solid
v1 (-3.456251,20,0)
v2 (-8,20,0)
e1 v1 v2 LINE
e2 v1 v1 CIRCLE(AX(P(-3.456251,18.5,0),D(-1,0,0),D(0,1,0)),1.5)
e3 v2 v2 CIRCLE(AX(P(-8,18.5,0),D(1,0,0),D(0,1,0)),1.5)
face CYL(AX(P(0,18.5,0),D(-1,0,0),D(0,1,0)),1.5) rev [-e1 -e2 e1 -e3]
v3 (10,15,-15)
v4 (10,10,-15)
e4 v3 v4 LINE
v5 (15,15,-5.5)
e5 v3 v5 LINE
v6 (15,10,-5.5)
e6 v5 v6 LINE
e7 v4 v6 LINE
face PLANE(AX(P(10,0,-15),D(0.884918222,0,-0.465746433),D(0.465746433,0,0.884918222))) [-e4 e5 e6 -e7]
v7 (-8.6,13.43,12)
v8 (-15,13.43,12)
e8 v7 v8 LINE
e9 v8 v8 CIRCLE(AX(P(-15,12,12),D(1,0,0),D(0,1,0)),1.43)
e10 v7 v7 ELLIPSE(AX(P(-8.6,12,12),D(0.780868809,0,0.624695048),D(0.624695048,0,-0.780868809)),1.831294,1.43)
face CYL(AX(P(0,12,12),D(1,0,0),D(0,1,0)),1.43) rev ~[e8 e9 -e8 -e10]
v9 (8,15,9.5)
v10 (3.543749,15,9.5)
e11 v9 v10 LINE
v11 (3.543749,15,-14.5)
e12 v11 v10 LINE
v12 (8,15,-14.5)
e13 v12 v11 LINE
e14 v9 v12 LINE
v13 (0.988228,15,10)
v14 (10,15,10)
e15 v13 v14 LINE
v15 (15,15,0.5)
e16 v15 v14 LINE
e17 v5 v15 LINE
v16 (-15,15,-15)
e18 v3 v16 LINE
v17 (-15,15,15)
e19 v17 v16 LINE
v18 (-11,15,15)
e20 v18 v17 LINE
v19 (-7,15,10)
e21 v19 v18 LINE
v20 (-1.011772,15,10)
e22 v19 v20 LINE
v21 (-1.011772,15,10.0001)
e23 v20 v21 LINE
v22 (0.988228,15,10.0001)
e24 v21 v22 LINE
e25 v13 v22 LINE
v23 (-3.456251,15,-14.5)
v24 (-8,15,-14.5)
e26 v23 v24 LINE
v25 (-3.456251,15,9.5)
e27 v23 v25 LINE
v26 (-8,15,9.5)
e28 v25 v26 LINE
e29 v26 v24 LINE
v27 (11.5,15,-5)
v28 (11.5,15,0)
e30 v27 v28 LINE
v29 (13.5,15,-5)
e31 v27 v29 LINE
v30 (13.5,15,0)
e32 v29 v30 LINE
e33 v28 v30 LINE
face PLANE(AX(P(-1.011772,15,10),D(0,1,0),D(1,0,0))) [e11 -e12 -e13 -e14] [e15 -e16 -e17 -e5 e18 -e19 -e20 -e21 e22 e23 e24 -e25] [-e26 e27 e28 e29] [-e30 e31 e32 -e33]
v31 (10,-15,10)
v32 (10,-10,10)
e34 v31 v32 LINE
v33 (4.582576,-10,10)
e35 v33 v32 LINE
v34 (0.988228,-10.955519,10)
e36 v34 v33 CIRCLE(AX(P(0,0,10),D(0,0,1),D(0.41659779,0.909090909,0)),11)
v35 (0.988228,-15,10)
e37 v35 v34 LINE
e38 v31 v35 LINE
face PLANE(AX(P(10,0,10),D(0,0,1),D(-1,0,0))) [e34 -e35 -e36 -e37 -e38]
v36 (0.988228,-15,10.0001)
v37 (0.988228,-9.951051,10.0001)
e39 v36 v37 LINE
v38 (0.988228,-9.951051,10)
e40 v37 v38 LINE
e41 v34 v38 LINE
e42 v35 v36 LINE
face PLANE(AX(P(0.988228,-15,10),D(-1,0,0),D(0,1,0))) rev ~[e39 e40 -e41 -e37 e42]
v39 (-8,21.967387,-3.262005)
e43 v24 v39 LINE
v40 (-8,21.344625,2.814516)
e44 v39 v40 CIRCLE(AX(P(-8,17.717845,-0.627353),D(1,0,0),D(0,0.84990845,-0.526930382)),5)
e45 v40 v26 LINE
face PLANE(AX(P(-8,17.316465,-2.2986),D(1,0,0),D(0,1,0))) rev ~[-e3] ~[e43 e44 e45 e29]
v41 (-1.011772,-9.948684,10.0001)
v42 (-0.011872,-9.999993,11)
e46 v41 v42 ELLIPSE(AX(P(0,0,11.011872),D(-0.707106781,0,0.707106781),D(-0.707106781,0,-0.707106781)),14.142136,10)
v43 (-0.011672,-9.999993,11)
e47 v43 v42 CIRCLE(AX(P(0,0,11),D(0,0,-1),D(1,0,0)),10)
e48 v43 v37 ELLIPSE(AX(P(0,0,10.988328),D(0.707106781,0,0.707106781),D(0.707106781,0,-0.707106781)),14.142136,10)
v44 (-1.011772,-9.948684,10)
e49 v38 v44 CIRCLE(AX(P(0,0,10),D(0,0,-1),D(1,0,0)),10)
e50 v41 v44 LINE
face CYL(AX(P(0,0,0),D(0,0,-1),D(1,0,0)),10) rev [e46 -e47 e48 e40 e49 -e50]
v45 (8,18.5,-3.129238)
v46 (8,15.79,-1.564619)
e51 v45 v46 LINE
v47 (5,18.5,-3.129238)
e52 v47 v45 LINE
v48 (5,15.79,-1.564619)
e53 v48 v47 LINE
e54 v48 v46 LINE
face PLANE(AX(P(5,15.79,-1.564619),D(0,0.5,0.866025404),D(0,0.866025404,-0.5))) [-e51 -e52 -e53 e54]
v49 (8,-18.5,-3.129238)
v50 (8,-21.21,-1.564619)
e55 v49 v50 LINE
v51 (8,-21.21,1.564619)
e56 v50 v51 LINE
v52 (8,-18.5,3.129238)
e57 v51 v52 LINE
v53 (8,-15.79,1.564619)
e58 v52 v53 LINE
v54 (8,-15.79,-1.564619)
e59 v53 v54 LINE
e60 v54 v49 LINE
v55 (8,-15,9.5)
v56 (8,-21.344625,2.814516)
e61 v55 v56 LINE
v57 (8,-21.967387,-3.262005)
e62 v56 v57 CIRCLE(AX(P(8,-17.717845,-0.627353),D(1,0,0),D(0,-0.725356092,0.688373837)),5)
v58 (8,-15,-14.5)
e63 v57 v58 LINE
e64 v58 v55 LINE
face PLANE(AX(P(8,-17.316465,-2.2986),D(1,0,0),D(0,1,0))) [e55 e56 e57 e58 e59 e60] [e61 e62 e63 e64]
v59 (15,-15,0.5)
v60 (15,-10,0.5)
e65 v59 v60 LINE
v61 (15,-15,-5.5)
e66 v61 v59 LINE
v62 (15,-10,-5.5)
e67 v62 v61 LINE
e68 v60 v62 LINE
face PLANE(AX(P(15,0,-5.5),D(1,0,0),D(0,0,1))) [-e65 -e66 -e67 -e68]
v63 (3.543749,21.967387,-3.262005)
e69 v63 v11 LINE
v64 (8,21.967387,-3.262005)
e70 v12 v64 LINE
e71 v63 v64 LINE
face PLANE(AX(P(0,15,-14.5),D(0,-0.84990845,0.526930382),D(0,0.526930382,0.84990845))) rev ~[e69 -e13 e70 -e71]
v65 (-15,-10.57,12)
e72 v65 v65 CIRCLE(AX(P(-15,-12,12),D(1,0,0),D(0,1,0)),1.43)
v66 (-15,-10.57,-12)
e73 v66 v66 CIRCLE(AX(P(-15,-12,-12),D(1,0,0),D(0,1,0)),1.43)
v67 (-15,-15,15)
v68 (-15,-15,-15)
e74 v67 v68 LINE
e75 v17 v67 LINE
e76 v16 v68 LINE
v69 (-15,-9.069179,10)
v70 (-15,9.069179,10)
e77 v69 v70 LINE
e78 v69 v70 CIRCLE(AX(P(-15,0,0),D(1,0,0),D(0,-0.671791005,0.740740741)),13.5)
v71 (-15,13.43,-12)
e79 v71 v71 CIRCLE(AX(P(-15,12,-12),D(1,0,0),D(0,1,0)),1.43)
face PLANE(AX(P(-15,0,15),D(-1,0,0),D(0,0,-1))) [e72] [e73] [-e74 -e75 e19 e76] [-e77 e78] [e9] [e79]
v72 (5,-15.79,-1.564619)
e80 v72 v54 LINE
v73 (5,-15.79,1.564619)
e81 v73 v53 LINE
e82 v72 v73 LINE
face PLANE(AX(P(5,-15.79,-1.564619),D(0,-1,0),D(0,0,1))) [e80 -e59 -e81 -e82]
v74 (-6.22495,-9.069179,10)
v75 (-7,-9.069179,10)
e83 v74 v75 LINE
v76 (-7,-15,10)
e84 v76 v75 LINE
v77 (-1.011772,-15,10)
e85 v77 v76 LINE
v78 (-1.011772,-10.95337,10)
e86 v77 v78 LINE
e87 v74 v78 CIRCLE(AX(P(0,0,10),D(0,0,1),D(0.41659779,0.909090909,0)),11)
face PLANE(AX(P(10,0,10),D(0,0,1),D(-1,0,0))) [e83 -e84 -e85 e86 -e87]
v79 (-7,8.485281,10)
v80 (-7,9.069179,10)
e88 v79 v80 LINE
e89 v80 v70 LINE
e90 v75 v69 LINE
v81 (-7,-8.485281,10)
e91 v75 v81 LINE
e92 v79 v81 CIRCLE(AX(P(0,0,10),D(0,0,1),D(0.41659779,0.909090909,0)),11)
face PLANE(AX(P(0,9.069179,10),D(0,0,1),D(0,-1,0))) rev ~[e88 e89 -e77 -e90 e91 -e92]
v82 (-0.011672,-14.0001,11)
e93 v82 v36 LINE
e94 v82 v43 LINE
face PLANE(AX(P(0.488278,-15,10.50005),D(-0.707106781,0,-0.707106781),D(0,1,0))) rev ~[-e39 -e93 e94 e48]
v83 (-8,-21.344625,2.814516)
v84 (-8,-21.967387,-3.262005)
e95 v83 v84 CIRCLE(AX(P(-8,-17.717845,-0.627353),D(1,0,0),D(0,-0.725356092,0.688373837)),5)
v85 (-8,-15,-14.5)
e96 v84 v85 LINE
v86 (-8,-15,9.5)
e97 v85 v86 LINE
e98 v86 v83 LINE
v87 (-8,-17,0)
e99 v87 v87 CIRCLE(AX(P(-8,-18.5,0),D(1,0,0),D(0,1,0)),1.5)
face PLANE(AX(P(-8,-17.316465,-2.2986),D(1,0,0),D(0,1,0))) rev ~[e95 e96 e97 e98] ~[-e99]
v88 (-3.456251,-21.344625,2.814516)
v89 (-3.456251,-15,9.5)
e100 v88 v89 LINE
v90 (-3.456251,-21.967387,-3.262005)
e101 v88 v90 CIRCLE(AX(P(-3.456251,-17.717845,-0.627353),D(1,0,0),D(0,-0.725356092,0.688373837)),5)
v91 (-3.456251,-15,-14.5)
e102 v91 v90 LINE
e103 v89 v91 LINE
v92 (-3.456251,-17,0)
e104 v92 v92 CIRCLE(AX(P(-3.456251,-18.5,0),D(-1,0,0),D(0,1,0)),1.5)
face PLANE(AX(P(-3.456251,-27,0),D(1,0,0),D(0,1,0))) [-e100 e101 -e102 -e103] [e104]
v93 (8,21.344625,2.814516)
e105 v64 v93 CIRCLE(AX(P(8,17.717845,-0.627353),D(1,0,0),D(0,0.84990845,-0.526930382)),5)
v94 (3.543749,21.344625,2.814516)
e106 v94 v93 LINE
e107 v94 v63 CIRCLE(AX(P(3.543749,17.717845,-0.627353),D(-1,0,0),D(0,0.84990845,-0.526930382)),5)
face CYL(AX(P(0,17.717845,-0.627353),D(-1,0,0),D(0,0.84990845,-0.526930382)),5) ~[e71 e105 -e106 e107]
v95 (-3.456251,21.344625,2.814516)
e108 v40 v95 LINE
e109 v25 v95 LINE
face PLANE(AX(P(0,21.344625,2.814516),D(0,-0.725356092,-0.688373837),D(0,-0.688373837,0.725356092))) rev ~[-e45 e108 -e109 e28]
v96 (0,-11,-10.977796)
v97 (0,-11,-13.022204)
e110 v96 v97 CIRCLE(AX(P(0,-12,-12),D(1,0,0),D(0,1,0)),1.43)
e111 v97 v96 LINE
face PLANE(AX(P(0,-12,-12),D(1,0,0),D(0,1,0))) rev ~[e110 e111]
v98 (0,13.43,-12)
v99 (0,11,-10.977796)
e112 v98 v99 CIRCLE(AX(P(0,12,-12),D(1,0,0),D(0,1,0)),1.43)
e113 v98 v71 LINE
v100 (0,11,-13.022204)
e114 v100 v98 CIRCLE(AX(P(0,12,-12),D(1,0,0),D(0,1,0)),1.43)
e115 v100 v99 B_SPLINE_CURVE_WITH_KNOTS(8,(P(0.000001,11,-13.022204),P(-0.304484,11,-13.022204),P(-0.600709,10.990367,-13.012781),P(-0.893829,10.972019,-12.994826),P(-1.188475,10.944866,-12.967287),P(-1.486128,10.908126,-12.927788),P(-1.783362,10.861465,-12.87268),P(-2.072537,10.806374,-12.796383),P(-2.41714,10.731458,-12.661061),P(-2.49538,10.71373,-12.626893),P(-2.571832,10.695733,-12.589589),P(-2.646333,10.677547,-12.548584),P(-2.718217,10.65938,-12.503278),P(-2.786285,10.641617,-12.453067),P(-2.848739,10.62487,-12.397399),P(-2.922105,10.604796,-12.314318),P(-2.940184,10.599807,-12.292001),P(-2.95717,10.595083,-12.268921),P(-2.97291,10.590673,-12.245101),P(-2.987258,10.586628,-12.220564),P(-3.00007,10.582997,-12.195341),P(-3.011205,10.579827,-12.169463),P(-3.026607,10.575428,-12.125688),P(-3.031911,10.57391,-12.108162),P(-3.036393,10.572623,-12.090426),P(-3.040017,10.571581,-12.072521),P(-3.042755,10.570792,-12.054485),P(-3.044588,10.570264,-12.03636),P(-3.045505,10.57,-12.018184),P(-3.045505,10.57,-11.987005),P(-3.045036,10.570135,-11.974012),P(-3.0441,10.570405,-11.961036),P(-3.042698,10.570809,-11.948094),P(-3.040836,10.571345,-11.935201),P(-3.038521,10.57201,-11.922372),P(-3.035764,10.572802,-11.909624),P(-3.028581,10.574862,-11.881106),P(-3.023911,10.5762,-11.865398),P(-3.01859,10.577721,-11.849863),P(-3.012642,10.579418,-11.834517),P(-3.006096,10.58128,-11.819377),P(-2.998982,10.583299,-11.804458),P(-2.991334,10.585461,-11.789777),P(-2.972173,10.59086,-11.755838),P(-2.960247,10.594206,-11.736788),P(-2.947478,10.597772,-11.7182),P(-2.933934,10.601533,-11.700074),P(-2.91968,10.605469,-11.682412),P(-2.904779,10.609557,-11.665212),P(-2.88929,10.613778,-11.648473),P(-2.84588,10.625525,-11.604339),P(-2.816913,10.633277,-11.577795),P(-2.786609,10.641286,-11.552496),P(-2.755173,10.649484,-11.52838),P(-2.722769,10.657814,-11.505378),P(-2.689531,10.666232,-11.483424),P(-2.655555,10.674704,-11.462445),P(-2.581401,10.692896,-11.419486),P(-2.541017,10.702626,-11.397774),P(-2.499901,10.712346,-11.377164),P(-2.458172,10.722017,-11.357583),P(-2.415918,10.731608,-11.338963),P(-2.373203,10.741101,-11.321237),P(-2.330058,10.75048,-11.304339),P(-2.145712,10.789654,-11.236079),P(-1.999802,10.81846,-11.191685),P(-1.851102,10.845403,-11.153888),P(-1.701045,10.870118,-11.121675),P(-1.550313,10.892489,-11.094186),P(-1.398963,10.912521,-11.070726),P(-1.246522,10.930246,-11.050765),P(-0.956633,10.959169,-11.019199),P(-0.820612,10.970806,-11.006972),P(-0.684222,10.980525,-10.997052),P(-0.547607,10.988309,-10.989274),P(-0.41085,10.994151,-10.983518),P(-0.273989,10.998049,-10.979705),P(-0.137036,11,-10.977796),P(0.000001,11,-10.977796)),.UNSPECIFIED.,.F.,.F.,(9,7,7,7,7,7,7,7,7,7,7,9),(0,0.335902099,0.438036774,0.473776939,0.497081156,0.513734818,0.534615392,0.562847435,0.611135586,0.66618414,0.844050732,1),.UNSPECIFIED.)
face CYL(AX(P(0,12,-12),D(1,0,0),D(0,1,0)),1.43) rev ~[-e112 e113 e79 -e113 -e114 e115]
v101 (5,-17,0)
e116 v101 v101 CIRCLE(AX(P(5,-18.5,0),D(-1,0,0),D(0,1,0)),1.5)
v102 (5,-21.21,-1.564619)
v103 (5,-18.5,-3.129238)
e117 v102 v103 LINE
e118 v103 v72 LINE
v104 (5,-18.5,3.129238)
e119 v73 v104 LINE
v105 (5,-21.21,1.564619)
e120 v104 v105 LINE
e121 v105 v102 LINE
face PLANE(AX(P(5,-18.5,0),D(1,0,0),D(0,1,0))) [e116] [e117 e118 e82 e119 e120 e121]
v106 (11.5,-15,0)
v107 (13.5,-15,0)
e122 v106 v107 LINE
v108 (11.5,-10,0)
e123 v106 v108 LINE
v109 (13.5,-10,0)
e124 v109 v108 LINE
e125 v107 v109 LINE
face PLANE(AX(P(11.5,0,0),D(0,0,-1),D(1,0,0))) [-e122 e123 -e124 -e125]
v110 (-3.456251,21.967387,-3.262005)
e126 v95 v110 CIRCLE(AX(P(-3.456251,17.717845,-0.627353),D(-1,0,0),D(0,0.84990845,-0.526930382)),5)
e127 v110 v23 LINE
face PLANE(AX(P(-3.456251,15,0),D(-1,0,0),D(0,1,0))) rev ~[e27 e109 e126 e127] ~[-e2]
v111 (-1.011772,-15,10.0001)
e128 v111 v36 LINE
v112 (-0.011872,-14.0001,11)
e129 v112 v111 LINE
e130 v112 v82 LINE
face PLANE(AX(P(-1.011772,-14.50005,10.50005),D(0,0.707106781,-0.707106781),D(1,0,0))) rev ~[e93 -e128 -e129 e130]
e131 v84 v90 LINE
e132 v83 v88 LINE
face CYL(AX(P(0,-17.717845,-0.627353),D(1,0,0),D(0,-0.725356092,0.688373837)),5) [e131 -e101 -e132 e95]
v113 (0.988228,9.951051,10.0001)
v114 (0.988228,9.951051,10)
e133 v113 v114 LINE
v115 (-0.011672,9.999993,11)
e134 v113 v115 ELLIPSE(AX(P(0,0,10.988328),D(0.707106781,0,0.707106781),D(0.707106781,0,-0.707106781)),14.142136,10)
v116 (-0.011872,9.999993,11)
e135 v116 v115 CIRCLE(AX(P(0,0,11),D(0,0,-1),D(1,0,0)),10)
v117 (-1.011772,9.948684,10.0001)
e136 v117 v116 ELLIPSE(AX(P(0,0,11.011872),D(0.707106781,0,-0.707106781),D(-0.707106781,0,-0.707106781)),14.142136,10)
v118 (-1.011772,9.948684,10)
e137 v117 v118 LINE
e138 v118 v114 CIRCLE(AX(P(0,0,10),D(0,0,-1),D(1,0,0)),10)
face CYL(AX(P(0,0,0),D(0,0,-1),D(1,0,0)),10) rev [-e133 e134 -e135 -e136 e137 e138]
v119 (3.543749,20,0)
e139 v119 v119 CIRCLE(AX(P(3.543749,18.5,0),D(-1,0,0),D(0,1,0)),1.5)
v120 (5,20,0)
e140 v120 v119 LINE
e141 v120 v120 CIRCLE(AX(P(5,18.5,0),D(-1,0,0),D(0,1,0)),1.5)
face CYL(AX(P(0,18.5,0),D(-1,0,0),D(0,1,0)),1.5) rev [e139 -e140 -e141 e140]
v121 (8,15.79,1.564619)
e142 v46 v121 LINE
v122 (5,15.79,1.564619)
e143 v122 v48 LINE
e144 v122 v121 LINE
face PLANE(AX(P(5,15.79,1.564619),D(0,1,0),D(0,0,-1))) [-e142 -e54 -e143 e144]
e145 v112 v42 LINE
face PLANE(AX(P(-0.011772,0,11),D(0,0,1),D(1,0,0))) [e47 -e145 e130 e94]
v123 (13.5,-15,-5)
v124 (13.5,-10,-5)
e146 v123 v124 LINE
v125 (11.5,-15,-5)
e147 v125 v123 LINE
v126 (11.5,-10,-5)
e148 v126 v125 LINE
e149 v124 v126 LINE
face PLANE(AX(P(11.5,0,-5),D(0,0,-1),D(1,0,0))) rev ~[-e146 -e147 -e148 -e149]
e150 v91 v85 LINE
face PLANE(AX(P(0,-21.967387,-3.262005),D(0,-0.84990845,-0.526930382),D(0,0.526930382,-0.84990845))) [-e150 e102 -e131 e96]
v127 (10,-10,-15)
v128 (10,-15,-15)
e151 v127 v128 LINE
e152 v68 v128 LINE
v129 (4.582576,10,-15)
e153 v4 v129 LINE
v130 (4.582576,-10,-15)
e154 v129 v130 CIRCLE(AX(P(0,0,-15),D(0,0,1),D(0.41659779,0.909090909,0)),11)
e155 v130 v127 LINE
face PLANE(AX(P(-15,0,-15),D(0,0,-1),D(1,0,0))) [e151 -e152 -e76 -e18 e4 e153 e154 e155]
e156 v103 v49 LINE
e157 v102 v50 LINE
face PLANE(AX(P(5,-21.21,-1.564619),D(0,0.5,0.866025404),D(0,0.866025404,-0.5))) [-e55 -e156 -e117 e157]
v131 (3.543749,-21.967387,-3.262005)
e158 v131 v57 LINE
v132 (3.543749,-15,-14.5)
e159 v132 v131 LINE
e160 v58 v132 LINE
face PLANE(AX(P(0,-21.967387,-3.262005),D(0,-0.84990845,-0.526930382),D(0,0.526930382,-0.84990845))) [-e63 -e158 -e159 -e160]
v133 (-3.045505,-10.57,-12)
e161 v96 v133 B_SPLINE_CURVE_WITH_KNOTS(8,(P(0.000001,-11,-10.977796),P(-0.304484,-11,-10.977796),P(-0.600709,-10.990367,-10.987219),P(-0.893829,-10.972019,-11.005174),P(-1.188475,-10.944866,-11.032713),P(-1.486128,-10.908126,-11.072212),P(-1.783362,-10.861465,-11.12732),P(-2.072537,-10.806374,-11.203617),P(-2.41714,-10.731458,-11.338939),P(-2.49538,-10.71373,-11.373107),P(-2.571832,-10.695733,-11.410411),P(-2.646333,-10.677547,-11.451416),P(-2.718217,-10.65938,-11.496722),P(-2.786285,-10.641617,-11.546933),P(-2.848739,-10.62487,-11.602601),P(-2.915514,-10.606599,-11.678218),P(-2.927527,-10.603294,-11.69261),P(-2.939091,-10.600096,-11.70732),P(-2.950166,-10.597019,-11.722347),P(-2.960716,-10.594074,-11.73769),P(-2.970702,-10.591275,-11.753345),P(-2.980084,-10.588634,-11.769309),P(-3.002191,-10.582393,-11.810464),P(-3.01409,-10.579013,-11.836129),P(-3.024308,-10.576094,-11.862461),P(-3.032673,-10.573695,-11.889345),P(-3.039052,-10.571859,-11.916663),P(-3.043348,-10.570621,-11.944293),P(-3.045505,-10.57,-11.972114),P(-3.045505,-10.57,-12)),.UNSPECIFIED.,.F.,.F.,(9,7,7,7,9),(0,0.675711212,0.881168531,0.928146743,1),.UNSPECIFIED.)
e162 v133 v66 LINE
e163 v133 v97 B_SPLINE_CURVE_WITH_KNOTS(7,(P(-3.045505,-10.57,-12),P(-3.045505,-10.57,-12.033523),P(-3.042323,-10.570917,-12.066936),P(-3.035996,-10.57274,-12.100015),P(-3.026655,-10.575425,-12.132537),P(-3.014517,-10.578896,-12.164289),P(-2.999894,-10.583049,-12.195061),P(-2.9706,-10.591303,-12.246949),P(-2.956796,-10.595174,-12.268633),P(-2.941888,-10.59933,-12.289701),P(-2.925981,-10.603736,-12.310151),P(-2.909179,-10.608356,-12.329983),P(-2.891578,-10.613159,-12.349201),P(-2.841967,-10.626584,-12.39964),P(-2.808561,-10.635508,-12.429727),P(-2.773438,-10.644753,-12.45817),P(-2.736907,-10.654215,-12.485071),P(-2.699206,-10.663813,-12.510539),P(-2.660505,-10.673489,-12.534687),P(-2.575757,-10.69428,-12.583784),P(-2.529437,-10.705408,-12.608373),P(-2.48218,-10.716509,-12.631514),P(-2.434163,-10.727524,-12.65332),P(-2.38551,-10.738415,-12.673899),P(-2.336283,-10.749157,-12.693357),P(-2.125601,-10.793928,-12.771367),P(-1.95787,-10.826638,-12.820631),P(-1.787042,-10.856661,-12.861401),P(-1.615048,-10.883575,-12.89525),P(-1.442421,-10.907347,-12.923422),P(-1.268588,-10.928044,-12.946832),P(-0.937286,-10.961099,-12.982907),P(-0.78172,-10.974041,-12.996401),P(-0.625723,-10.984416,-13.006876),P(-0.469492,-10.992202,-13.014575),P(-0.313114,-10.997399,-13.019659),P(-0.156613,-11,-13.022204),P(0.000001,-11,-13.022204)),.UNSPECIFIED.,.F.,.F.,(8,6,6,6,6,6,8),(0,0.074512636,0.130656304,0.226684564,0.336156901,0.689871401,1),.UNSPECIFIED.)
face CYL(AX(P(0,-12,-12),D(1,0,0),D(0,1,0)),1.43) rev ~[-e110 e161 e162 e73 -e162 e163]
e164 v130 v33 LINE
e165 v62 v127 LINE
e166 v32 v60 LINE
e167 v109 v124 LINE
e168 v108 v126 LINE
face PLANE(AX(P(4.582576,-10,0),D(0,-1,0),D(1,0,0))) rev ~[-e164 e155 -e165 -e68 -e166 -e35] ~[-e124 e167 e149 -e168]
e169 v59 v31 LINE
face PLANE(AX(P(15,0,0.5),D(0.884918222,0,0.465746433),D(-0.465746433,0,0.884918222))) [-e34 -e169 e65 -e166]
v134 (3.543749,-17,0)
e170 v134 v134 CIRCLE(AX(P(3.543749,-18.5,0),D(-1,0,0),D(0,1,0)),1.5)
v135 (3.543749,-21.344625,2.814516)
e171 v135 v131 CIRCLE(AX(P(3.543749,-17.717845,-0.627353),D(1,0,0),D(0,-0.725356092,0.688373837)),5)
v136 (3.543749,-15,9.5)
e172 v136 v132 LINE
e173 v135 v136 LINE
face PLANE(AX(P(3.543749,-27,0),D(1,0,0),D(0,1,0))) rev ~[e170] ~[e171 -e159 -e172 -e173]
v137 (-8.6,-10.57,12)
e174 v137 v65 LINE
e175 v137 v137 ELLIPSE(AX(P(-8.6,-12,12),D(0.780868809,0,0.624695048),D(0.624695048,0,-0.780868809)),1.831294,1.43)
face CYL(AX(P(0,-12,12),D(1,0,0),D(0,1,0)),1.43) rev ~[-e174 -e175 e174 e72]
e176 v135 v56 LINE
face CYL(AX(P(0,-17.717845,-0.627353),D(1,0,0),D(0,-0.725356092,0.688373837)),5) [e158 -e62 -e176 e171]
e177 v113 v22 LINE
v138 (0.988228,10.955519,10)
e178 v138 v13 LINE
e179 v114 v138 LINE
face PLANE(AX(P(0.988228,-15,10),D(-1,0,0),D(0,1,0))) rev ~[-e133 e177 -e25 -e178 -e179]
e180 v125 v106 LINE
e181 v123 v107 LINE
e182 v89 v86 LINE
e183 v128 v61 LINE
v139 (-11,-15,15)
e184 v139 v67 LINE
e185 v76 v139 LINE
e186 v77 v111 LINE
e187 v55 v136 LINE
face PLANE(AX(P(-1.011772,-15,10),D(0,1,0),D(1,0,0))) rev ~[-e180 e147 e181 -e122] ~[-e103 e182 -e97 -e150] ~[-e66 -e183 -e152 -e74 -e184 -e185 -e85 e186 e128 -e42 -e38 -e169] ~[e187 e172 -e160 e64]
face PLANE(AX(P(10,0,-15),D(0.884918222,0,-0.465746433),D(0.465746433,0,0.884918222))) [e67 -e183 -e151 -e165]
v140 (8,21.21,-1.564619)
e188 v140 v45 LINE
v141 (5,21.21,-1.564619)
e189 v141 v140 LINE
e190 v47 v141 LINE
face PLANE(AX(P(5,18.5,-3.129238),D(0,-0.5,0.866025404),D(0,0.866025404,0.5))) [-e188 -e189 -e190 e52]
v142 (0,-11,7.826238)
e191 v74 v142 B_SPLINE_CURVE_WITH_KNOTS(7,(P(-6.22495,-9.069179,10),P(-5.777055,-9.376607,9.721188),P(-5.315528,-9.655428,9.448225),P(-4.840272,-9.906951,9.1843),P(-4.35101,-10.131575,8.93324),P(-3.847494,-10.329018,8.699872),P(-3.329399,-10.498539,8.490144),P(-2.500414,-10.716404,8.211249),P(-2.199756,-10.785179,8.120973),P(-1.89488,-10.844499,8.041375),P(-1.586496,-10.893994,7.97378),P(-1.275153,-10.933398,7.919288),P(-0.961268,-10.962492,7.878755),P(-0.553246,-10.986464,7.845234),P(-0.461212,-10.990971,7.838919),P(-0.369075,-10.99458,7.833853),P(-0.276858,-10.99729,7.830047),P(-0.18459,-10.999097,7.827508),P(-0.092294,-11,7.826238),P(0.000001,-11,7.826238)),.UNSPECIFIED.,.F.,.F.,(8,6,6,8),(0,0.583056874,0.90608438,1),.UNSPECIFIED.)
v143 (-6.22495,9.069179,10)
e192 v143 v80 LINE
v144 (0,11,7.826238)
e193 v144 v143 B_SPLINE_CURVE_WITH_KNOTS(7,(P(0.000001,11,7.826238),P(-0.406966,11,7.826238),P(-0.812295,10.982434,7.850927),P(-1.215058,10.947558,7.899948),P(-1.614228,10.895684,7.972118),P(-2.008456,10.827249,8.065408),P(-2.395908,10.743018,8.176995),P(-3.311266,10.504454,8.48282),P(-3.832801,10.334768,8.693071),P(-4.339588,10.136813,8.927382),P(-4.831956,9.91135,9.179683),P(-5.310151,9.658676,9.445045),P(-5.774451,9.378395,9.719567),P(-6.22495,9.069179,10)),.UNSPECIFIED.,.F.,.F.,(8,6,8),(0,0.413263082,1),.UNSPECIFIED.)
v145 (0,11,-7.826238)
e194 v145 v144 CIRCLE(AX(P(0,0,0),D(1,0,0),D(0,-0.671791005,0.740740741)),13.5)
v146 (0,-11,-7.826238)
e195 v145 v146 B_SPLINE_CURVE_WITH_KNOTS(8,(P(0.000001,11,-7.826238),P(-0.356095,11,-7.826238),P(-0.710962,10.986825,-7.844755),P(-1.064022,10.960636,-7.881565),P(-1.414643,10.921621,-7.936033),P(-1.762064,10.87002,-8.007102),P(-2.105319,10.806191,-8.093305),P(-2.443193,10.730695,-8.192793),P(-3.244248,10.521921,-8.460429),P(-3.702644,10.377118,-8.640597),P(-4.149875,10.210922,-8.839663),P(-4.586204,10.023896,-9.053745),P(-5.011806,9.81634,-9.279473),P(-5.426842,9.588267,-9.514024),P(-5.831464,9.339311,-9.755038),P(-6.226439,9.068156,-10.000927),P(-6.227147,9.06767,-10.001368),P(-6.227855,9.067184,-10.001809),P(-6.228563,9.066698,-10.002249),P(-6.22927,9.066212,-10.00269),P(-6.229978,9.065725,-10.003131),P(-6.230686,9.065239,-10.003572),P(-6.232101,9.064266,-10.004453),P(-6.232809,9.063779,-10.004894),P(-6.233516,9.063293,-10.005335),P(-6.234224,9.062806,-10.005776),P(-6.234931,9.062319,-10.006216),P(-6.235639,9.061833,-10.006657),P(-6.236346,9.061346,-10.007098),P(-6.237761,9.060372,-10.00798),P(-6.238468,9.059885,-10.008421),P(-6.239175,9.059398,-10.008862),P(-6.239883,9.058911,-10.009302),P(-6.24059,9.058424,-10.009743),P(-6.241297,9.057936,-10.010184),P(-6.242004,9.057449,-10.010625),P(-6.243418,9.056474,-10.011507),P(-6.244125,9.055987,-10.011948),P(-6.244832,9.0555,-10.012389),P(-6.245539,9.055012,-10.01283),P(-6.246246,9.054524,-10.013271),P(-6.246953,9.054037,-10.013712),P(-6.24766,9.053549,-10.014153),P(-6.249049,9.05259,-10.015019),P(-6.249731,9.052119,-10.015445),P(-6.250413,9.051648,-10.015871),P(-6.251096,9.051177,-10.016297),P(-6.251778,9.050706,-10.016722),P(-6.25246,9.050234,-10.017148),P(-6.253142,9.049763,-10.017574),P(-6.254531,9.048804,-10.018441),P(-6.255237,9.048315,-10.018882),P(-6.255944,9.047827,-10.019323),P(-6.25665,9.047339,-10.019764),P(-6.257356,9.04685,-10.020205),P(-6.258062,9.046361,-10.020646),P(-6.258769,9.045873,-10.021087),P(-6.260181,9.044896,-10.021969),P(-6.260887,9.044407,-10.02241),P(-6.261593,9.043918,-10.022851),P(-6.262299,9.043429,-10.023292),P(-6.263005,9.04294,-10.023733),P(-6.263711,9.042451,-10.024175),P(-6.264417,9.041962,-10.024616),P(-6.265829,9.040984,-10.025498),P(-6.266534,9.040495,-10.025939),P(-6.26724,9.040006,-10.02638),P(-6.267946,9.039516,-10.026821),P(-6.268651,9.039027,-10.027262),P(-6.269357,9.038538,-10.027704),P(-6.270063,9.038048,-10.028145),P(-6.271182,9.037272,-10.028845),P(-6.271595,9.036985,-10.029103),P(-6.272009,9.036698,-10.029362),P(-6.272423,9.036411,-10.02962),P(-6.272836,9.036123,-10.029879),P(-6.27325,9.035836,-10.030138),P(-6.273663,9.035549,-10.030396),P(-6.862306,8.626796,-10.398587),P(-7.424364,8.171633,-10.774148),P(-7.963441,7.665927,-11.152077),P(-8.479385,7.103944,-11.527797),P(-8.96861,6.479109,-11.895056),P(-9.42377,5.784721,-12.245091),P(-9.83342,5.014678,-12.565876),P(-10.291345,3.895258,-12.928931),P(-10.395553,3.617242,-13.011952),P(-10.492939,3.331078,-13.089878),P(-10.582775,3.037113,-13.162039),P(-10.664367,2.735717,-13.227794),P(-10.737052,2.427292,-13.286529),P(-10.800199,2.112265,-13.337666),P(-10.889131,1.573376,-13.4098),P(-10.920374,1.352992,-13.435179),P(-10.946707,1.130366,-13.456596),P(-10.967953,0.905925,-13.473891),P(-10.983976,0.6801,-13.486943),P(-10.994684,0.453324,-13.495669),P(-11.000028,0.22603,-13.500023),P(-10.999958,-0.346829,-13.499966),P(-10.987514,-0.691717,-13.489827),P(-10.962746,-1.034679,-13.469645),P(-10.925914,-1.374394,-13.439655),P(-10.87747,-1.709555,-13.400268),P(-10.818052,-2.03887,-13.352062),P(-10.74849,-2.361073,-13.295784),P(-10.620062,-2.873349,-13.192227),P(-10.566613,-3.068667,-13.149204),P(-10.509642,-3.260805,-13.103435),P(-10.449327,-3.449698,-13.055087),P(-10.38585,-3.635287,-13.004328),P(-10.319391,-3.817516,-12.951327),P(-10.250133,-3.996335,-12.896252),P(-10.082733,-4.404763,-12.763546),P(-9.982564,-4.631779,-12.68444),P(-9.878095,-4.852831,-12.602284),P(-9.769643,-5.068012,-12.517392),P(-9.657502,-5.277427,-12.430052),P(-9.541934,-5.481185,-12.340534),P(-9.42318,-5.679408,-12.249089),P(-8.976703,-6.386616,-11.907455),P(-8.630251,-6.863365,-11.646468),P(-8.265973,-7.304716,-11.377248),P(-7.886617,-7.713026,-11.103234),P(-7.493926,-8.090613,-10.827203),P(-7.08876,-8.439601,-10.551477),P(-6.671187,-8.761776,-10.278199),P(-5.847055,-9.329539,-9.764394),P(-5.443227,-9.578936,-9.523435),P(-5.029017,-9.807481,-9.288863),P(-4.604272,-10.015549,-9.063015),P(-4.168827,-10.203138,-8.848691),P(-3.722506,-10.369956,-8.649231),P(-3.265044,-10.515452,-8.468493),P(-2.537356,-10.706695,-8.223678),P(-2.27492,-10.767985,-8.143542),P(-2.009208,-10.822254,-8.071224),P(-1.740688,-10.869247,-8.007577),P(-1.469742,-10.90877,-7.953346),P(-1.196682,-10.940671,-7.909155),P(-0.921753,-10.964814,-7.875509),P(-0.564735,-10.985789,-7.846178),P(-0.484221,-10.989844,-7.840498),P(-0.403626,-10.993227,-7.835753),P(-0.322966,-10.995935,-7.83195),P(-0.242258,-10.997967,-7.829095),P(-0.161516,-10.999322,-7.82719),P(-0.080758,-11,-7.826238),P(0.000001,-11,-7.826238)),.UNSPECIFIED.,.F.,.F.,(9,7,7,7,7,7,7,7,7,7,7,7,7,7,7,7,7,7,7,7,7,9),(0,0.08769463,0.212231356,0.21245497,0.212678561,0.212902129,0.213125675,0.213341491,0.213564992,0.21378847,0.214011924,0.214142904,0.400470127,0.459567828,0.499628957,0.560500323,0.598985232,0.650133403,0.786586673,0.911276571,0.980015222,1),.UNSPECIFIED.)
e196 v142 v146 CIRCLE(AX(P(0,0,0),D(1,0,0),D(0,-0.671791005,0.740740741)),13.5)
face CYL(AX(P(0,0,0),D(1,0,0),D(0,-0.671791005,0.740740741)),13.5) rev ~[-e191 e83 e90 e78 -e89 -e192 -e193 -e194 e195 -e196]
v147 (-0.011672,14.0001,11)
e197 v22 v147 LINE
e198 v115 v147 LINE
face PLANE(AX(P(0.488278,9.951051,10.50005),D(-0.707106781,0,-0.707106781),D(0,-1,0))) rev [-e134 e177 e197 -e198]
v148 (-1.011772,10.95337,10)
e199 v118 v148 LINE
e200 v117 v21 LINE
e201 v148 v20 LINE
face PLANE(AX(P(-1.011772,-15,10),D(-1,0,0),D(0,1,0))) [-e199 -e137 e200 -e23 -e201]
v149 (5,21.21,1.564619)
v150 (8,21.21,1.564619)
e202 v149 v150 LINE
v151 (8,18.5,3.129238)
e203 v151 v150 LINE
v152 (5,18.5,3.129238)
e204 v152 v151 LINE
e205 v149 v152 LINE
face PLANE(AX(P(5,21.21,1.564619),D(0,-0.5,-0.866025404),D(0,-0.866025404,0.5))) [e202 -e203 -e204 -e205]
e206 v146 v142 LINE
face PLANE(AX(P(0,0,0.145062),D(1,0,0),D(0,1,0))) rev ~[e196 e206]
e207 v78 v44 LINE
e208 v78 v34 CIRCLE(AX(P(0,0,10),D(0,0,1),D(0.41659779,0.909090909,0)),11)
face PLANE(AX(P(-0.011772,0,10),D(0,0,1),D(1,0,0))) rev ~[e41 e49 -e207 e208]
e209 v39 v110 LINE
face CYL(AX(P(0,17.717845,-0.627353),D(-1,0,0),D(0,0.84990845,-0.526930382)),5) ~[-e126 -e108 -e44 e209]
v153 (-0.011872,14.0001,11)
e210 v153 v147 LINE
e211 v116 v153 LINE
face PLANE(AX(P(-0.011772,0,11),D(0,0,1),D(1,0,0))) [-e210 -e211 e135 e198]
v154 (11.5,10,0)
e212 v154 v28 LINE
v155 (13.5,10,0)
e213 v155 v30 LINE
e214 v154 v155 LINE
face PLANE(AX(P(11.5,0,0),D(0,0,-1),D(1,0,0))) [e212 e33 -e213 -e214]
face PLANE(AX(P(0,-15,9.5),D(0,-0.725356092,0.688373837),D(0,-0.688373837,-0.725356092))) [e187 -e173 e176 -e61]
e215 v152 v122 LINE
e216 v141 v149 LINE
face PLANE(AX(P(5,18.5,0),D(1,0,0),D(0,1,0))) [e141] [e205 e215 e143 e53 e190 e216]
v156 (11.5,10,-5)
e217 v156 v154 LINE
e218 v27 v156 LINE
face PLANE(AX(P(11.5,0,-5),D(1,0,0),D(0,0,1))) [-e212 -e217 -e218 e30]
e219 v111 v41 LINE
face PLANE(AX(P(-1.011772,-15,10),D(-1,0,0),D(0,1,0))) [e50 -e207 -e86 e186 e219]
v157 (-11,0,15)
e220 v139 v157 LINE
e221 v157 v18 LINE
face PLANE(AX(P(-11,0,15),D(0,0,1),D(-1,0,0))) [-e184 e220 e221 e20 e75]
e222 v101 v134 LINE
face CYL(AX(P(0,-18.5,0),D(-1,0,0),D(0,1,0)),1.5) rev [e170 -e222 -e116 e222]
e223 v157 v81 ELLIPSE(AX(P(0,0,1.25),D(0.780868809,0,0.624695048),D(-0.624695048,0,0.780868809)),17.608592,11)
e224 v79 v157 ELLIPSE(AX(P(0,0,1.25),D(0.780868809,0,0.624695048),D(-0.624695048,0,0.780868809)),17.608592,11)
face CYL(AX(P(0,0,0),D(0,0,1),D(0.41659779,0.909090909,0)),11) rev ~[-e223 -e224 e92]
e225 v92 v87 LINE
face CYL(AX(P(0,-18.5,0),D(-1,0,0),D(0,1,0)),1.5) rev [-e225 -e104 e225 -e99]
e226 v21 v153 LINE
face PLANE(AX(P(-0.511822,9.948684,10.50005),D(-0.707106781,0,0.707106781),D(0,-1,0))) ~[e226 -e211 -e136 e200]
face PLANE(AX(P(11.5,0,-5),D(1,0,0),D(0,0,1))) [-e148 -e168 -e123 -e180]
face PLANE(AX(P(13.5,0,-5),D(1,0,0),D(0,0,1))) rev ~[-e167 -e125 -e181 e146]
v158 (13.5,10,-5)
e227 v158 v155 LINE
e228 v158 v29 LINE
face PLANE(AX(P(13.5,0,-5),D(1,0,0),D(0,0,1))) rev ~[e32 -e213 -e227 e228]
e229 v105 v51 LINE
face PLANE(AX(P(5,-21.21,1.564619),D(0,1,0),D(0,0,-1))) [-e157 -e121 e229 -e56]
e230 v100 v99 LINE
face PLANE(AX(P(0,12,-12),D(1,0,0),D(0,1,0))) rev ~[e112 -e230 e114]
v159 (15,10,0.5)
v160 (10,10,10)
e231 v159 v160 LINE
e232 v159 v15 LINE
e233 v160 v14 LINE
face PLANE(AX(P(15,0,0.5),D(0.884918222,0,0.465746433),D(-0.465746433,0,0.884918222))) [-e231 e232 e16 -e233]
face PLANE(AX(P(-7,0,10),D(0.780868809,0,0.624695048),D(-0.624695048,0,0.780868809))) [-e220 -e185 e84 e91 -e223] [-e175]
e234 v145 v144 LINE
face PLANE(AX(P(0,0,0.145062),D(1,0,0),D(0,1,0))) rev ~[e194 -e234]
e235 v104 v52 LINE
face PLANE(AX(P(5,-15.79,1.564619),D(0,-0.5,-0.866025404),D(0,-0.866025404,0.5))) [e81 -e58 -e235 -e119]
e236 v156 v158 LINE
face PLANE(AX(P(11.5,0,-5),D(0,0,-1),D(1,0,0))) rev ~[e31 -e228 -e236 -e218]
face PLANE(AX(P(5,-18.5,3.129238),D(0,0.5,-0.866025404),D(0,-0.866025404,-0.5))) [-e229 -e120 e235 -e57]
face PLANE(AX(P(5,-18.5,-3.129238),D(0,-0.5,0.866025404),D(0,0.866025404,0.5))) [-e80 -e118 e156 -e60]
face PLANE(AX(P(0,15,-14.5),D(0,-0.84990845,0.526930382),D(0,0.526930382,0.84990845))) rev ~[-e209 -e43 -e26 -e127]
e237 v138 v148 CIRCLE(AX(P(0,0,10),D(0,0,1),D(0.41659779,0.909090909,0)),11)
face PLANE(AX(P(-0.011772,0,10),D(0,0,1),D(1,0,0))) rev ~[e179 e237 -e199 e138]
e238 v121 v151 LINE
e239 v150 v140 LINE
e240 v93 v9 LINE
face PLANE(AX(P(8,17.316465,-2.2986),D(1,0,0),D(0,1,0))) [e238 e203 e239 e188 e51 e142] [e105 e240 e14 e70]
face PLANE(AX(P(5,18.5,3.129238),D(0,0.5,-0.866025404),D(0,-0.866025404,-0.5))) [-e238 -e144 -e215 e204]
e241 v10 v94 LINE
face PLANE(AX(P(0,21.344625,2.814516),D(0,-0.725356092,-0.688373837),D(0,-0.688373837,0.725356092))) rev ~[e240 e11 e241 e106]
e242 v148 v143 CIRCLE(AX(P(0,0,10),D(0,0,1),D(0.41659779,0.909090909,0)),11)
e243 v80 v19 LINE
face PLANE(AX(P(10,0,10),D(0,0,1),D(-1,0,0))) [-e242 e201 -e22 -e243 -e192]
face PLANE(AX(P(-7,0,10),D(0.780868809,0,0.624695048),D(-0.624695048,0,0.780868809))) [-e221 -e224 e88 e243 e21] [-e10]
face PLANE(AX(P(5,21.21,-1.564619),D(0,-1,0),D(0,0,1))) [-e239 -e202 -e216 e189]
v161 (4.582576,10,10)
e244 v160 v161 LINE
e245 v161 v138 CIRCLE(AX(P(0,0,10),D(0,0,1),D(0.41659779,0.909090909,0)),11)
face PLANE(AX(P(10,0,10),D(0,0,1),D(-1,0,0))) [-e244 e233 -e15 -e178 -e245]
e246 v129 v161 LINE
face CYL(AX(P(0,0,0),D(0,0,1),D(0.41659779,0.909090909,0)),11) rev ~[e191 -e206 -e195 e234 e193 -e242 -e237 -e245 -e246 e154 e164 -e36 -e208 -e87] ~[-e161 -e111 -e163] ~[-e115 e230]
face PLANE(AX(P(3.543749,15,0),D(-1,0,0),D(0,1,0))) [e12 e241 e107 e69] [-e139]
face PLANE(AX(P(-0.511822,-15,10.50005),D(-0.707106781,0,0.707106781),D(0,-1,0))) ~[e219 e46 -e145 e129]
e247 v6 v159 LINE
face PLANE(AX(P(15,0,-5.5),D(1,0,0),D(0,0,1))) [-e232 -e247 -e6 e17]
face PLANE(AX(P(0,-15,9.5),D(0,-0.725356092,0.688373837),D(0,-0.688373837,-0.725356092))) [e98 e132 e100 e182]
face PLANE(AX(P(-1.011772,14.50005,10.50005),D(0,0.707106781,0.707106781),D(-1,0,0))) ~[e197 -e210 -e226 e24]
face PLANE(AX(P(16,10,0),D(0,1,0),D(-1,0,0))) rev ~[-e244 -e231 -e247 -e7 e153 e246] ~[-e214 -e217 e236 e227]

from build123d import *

# Parameters (mm, degrees)
F0_W      = 2
F0_H      = 5
F5_DEPTH  = 15
F6_DEPTH  = 15
F7_DEPTH  = 16
F2_R      = 1.43
F8_DEPTH  = 25
F9_DEPTH  = 25
F3_R      = 1.5
F10_DEPTH = 8
F11_START = 5
F11_DEPTH = 20
F4_W      = 7
F4_H      = 12
F12_DEPTH = 20
F14_START = 10
F13_W     = 2
F13_H     = 30
F14_DEPTH = 1
F15_R     = 10
F16_DEPTH = 25
F17_SIZE  = 0.9999


# Not quite as in the source:
# - a fillet or chamfer is up to 0.001 mm smaller than in the source, because OpenCascade refuses the exact size


with BuildPart() as f5:
    # F0 (on Front) → F5 (new body, symmetric)
    with BuildSketch(Plane.XZ):
        Polygon((-11, 15), (-15, 15), (-15, -15), (10, -15), (10, 10), (-7, 10), align=None)
        Polygon((10, 10), (10, -15), (15, -5.5), (15, 0.5), align=None)
        with Locations((12.5, -2.5)):
            Rectangle(F0_W, F0_H, mode=Mode.SUBTRACT)
    extrude(amount=F5_DEPTH, both=True)

    # F1 (on Top) → F6 (cut, symmetric)
    with BuildSketch(Plane.XY):
        with BuildLine():
            Line((16, 10), (4.582575695, 10))
            ThreePointArc((4.582575695, 10), (-11, 0), (4.582575695, -10))
            Line((4.582575695, -10), (16, -10))
            Line((16, -10), (16, 10))
        make_face()
    extrude(amount=F6_DEPTH, both=True, mode=Mode.SUBTRACT)

    # F2 (on Right) → F7 (cut)
    with BuildSketch(Plane.YZ):
        with BuildLine():
            Line((9.0691785736, 10), (-9.0691785736, 10))
            ThreePointArc((-9.0691785736, 10), (0, -13.5), (9.0691785736, 10))
        make_face()
    extrude(amount=-F7_DEPTH, mode=Mode.SUBTRACT)

    # F2 (on Right) → F8 (cut)
    with BuildSketch(Plane.YZ):
        with Locations((12, 12)):
            Circle(F2_R)
        with Locations((-12, 12)):
            Circle(F2_R)
    extrude(amount=-F8_DEPTH, mode=Mode.SUBTRACT)

    # F2 (on Right) → F9 (cut)
    with BuildSketch(Plane.YZ):
        with Locations((12, -12)):
            Circle(F2_R)
        with Locations((-12, -12)):
            Circle(F2_R)
    extrude(amount=-F9_DEPTH, mode=Mode.SUBTRACT)

    # F3 (on Right) → F10 (join, symmetric)
    with BuildSketch(Plane.YZ):
        with BuildLine():
            Line((15, -14.5), (21.9673867507, -3.2620052331))
            ThreePointArc((21.9673867507, -3.2620052331), (22.6917908233, -0.1175906407), (21.3446249631, 2.8145158605))
            Line((21.3446249631, 2.8145158605), (15, 9.5))
            Line((15, 9.5), (15, -14.5))
        make_face()
        Polygon((18.5, 3.129238459), (21.21, 1.5646192295), (21.21, -1.5646192295), (18.5, -3.129238459), (15.79, -1.5646192295), (15.79, 1.5646192295), align=None, mode=Mode.SUBTRACT)
        Polygon((21.21, -1.5646192295), (21.21, 1.5646192295), (18.5, 3.129238459), (15.79, 1.5646192295), (15.79, -1.5646192295), (18.5, -3.129238459), align=None)
        with Locations((18.5, 0)):
            Circle(F3_R, mode=Mode.SUBTRACT)
        with BuildLine():
            Line((-15, 9.5), (-21.3446249631, 2.8145158605))
            ThreePointArc((-21.3446249631, 2.8145158605), (-22.6917908233, -0.1175906407), (-21.9673867507, -3.2620052331))
            Line((-21.9673867507, -3.2620052331), (-15, -14.5))
            Line((-15, -14.5), (-15, 9.5))
        make_face()
        Polygon((-21.21, 1.5646192295), (-18.5, 3.129238459), (-15.79, 1.5646192295), (-15.79, -1.5646192295), (-18.5, -3.129238459), (-21.21, -1.5646192295), align=None, mode=Mode.SUBTRACT)
        Polygon((-15.79, 1.5646192295), (-18.5, 3.129238459), (-21.21, 1.5646192295), (-21.21, -1.5646192295), (-18.5, -3.129238459), (-15.79, -1.5646192295), align=None)
        with Locations((-18.5, 0)):
            Circle(F3_R, mode=Mode.SUBTRACT)
    extrude(amount=F10_DEPTH, both=True)

    # F3 (on Right) → F11 (cut)
    with BuildSketch(Plane.YZ.offset(F11_START)):
        Polygon((21.21, -1.5646192295), (21.21, 1.5646192295), (18.5, 3.129238459), (15.79, 1.5646192295), (15.79, -1.5646192295), (18.5, -3.129238459), align=None)
        with Locations((18.5, 0)):
            Circle(F3_R, mode=Mode.SUBTRACT)
        with Locations((18.5, 0)):
            Circle(F3_R)
        Polygon((-15.79, 1.5646192295), (-18.5, 3.129238459), (-21.21, 1.5646192295), (-21.21, -1.5646192295), (-18.5, -3.129238459), (-15.79, -1.5646192295), align=None)
        with Locations((-18.5, 0)):
            Circle(F3_R, mode=Mode.SUBTRACT)
        with Locations((-18.5, 0)):
            Circle(F3_R)
    extrude(amount=F11_DEPTH, mode=Mode.SUBTRACT)

    # F4 (on Top) → F12 (cut, symmetric)
    with BuildSketch(Plane.XY):
        with Locations((0.0437486451, 21)):
            Rectangle(F4_W, F4_H)
        with Locations((0.0437486451, -21)):
            Rectangle(F4_W, F4_H)
    extrude(amount=F12_DEPTH, both=True, mode=Mode.SUBTRACT)

    # F13 (on Top) → F14 (join)
    with BuildSketch(Plane.XY.offset(F14_START)):
        with Locations((-0.0117724412, 0)):
            Rectangle(F13_W, F13_H)
    extrude(amount=F14_DEPTH)

    # F15 (on Top) → F16 (cut)
    with BuildSketch(Plane.XY):
        Circle(F15_R)
    extrude(amount=F16_DEPTH, mode=Mode.SUBTRACT)

    # F17 (size 1 in the source; OpenCascade refuses exactly that, so slightly less here)
    f17_edges = [f5.edges().sort_by_distance(p)[0] for p in [
        (0.988228, 12.475525, 11),
        (-1.011772, 12.474342, 11),
        (-0.011772, 15, 11),
        (0.988228, -12.475525, 11),
        (-0.011772, -15, 11),
        (-1.011772, -12.474342, 11),
    ]]
    chamfer(f17_edges, length=F17_SIZE)


solid = f5.part
